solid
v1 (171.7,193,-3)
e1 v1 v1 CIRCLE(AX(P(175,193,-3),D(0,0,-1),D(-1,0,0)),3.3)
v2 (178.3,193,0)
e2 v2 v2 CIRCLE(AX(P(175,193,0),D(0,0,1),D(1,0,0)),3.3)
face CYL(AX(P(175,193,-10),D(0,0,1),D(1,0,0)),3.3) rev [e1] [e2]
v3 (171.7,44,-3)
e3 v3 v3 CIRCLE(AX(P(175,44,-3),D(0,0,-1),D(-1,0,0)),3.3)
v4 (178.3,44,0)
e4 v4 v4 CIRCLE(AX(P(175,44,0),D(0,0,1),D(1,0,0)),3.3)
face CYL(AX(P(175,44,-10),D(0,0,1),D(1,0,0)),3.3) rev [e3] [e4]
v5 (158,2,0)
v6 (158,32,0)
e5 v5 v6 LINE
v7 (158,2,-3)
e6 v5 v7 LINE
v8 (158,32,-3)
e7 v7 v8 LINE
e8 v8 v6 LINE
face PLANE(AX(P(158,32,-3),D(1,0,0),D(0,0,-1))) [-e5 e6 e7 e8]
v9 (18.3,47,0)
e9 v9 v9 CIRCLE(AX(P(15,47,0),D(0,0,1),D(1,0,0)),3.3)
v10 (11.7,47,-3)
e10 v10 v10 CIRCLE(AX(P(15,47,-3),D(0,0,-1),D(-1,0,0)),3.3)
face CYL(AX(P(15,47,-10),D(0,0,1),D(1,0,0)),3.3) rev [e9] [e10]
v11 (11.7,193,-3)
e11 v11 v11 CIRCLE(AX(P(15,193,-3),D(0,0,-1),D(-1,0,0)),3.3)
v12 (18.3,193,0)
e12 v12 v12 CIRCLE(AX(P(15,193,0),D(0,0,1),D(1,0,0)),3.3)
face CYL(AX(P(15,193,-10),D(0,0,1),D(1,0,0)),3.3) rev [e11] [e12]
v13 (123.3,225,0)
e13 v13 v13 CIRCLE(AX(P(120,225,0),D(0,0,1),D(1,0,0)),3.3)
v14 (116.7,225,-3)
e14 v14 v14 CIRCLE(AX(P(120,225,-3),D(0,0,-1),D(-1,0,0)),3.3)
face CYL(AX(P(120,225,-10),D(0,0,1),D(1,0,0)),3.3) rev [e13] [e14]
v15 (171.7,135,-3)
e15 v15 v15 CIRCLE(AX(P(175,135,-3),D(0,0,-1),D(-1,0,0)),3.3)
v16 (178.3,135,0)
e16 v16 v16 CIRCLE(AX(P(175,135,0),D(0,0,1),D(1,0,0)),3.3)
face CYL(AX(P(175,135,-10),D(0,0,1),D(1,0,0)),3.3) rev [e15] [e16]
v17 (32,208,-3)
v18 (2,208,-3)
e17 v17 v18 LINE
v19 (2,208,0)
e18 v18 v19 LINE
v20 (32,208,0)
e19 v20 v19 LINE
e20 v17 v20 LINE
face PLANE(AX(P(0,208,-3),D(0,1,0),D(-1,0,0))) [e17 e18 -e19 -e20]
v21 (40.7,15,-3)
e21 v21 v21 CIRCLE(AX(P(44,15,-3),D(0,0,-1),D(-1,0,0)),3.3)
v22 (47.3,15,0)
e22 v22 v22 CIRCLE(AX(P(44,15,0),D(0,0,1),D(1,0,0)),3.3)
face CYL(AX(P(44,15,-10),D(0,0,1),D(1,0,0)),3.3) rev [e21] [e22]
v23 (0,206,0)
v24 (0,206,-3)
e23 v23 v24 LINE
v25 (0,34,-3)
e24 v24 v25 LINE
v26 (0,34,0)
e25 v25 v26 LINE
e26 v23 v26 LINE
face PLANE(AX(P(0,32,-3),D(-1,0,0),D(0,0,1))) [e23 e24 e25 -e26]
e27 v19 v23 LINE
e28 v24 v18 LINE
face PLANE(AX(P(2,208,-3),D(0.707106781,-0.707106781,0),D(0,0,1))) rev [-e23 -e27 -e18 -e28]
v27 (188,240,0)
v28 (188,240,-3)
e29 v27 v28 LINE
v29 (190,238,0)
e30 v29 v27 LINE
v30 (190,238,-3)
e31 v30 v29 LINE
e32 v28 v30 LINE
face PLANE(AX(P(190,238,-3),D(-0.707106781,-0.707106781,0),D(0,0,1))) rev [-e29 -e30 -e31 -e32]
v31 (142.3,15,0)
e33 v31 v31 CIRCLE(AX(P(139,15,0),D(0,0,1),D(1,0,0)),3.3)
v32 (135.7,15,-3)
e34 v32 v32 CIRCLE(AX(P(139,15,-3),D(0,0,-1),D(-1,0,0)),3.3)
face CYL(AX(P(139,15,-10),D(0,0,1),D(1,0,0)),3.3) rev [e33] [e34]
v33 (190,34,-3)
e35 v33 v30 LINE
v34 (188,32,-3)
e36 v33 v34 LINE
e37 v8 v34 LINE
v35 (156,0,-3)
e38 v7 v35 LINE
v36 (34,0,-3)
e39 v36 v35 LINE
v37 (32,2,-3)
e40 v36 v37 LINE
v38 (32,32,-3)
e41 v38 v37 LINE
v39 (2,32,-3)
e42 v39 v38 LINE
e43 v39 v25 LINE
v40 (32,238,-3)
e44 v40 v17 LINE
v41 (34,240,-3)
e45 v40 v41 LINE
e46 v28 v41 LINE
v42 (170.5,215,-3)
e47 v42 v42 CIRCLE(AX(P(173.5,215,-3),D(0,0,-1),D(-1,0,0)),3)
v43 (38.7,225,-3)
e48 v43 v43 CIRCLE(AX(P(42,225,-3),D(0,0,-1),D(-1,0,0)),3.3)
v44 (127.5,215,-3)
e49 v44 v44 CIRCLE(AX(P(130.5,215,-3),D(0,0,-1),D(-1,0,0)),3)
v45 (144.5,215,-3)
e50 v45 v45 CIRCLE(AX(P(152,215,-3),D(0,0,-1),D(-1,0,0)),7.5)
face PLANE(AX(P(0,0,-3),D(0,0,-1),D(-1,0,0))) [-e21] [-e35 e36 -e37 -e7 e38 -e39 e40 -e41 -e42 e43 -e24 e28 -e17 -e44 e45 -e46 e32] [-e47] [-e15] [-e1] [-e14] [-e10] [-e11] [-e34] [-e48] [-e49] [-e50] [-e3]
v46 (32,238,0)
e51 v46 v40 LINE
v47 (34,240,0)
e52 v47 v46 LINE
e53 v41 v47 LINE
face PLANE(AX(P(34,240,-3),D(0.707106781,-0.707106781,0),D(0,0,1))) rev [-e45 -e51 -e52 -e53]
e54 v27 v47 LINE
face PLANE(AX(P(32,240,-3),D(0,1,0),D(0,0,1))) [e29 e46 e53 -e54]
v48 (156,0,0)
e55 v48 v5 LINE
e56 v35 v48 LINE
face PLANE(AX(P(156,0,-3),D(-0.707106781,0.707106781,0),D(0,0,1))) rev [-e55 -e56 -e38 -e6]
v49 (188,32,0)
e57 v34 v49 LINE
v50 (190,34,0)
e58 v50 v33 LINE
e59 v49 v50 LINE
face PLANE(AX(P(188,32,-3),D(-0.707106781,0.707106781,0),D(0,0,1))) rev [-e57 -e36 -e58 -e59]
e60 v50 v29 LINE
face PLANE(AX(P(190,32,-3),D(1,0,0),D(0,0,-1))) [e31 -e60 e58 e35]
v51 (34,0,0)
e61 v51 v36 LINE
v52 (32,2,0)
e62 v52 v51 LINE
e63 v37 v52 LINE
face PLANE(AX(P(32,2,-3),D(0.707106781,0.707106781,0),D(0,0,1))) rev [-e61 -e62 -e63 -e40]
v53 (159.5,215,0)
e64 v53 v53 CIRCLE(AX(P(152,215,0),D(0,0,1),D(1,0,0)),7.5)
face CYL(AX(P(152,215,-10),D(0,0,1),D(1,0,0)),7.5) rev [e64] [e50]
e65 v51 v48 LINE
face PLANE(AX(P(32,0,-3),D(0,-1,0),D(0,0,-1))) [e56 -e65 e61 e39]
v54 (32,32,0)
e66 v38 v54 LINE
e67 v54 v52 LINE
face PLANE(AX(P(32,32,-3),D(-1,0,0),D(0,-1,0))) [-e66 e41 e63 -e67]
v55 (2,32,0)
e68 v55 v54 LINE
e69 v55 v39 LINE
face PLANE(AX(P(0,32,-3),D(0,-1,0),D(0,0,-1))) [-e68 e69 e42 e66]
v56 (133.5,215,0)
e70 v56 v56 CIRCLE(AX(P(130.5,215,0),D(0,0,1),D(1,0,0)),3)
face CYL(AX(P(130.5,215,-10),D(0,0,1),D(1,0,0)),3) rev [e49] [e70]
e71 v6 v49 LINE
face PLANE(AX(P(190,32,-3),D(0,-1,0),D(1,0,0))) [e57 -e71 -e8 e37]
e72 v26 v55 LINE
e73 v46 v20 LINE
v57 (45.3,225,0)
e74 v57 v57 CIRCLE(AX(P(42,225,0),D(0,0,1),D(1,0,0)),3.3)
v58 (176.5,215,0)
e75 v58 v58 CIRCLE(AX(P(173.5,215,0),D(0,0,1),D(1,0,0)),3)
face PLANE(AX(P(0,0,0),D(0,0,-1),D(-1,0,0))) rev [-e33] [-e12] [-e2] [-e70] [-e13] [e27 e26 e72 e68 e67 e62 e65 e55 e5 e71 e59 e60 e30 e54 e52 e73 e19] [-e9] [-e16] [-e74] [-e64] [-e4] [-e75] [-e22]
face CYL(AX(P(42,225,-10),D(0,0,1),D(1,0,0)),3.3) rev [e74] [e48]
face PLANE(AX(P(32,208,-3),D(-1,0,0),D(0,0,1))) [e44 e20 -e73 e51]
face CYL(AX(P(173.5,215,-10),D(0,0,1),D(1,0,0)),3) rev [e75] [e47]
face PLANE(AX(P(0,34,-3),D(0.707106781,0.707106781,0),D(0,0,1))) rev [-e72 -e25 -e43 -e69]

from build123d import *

# Parameters (mm, degrees)
BASE_FLANGE1_DEPTH = 3
CHAMFER1_SIZE      = 2
SKETCH3_R          = 3
CUT_EXTRUDE1_DEPTH = 10
SKETCH4_R          = 3.3
SKETCH4_R_2        = 7.5
CUT_EXTRUDE2_DEPTH = 10


# Sheet-metal steps are written as plain solids
with BuildPart() as part:
    # Sketch1 → Base-Flange1 (new body)
    with BuildSketch(Plane.XY):
        Polygon((0, 208), (32, 208), (32, 240), (190, 240), (190, 32), (158, 32), (158, 0), (32, 0), (32, 32), (0, 32), align=None)
    extrude(amount=-BASE_FLANGE1_DEPTH)

    # Chamfer1
    chamfer1_edges = [part.edges().sort_by_distance(p)[0] for p in [
        (190, 32, -1.5),
        (158, 0, -1.5),
        (32, 0, -1.5),
        (0, 32, -1.5),
        (0, 208, -1.5),
        (32, 240, -1.5),
        (190, 240, -1.5),
    ]]
    chamfer(chamfer1_edges, length=CHAMFER1_SIZE)

    # Sketch3 → Cut-Extrude1 (cut)
    with BuildSketch(Plane.XY):
        with Locations((130.5, 215)):
            Circle(SKETCH3_R)
        with Locations((173.5, 215)):
            Circle(SKETCH3_R)
    extrude(amount=-CUT_EXTRUDE1_DEPTH, mode=Mode.SUBTRACT)

    # Sketch4 → Cut-Extrude2 (cut)
    with BuildSketch(Plane.XY):
        with Locations((42, 225)):
            Circle(SKETCH4_R)
        with Locations((120, 225)):
            Circle(SKETCH4_R)
        with Locations((175, 193)):
            Circle(SKETCH4_R)
        with Locations((175, 135)):
            Circle(SKETCH4_R)
        with Locations((175, 44)):
            Circle(SKETCH4_R)
        with Locations((139, 15)):
            Circle(SKETCH4_R)
        with Locations((44, 15)):
            Circle(SKETCH4_R)
        with Locations((15, 193)):
            Circle(SKETCH4_R)
        with Locations((15, 47)):
            Circle(SKETCH4_R)
        with Locations((152, 215)):
            Circle(SKETCH4_R_2)
    extrude(amount=-CUT_EXTRUDE2_DEPTH, mode=Mode.SUBTRACT)


solid = part.part
